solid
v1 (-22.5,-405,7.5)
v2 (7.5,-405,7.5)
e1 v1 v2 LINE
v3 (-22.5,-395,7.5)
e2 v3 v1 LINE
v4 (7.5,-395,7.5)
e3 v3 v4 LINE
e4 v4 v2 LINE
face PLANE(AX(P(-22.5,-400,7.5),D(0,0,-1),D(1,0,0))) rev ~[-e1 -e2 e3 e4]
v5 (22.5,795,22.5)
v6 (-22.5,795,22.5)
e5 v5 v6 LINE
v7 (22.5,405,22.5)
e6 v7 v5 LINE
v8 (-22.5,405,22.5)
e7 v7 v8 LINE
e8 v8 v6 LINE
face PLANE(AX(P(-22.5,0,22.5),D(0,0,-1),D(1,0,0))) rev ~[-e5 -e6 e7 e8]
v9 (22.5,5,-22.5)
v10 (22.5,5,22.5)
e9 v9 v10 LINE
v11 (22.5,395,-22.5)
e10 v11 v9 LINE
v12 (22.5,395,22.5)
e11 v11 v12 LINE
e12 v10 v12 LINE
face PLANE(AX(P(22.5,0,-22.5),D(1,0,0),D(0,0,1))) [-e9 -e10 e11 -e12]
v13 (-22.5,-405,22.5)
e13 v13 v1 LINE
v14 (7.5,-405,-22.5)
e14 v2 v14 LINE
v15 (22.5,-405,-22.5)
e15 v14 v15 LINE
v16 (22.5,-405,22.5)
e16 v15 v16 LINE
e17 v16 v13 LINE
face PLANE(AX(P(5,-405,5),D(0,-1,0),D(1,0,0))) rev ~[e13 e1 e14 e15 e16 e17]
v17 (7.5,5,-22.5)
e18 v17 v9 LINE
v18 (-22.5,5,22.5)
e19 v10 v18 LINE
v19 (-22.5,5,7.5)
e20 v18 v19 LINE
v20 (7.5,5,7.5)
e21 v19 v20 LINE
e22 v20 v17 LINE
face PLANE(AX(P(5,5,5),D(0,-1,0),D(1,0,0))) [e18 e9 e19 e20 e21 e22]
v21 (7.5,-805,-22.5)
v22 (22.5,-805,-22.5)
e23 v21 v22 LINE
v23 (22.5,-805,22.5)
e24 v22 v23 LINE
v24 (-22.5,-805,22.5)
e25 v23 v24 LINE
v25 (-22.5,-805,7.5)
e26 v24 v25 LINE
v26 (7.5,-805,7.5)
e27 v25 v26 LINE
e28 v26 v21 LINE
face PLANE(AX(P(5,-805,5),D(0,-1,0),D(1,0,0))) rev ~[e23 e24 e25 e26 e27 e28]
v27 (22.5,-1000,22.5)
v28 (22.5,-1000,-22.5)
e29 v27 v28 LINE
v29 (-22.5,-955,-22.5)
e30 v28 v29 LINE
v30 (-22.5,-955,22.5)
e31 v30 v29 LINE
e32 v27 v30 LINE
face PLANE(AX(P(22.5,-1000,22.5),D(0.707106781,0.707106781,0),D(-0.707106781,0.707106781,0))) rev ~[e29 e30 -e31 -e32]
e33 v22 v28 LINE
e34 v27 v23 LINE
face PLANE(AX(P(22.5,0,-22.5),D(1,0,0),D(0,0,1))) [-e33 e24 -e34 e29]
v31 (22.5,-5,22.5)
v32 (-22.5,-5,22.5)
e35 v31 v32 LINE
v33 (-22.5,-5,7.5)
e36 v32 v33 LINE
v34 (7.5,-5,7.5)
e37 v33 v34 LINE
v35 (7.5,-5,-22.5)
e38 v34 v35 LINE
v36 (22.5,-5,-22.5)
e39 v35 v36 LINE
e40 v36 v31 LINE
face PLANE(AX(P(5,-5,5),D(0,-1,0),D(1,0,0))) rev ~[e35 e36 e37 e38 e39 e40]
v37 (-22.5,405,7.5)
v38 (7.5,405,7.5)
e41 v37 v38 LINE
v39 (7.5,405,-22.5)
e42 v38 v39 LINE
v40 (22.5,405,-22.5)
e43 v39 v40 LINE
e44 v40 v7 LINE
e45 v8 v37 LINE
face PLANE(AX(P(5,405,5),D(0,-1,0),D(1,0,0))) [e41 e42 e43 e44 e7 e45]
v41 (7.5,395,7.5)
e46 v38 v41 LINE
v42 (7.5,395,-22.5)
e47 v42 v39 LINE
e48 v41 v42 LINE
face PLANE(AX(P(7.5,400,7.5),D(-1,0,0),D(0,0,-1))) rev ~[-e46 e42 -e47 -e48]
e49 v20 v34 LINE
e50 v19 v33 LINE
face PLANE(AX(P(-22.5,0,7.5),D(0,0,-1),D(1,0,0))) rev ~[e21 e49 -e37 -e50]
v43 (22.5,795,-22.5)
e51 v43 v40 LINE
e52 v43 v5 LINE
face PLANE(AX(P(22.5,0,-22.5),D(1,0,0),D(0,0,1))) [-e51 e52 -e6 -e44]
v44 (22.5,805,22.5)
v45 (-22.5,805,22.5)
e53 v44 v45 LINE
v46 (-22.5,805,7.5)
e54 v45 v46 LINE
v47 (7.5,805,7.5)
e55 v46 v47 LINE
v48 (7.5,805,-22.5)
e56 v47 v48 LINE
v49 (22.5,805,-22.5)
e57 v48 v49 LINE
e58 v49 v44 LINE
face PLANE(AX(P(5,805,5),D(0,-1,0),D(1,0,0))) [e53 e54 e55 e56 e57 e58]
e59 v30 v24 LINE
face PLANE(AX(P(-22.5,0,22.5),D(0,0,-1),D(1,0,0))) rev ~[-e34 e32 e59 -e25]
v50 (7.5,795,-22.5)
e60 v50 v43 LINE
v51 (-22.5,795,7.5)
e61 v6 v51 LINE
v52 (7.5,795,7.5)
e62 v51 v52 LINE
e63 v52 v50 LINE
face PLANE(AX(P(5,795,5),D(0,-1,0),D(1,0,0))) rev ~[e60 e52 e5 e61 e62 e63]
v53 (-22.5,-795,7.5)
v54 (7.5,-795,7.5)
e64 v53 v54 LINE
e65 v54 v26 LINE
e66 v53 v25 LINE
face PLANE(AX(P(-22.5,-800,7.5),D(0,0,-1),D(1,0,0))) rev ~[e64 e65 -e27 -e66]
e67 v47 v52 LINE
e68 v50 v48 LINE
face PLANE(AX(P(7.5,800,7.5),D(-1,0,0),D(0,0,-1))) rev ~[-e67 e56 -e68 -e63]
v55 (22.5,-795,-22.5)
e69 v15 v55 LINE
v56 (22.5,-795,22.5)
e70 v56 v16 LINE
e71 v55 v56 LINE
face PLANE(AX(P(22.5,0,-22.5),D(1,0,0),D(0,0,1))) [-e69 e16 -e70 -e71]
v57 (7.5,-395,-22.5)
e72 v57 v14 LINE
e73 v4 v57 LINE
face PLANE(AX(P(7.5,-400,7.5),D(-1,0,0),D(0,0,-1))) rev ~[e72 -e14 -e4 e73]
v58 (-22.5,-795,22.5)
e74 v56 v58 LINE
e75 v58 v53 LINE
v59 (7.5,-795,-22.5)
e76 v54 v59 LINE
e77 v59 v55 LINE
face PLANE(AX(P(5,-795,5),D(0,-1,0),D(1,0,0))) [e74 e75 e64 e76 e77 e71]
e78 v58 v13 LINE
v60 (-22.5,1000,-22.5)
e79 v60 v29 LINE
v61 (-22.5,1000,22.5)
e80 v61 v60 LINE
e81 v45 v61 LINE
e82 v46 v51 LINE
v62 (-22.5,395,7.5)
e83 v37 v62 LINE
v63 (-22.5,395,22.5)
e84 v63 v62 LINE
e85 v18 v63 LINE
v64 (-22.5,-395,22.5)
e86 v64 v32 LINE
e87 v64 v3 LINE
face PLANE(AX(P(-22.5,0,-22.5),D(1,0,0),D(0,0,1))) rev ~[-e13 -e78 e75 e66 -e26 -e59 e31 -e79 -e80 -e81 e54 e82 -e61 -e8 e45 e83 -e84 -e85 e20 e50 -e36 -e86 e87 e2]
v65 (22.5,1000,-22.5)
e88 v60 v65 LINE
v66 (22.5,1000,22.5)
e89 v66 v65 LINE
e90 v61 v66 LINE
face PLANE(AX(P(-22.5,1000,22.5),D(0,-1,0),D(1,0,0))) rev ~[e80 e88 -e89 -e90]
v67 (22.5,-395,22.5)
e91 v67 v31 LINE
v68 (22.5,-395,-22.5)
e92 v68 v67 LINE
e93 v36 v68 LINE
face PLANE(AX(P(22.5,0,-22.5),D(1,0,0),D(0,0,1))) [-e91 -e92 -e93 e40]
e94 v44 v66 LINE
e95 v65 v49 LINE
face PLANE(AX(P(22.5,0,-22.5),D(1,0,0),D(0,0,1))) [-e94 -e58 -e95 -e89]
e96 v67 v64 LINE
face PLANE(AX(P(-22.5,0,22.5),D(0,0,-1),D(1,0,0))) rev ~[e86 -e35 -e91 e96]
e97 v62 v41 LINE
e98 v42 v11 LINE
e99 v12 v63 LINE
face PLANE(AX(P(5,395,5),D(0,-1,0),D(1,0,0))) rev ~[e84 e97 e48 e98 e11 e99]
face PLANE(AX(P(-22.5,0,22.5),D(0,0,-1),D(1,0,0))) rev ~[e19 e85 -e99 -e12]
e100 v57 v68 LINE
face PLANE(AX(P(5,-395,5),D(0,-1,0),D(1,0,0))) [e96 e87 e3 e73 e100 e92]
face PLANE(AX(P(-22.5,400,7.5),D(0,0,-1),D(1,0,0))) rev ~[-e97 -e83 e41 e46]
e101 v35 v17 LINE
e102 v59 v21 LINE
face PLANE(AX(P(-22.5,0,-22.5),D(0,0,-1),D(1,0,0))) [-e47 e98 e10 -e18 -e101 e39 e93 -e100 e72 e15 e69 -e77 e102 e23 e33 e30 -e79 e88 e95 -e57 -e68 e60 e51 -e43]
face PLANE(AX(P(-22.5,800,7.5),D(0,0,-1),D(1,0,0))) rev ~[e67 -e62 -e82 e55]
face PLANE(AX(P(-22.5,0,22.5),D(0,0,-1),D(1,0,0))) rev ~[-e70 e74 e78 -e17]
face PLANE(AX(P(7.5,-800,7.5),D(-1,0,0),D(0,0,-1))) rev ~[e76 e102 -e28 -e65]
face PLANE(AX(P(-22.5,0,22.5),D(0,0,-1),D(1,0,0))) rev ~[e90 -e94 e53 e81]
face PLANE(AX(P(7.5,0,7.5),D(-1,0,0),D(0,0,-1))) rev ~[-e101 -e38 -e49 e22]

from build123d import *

# Parameters (mm, degrees)
F0_W            = 45
F0_H            = 45
F1_DEPTH        = 1500
F2_W            = 45
F2_H            = 500
F3_DEPTH        = 45
F5_DEPTH        = 5
F5_COPIES_COUNT = 3
F5_COPIES_PITCH = 400
F8_DEPTH        = 5
F11_DEPTH       = 5


# Not quite as in the source:
# - a pattern or mirror of a feature is missing from the dataset's text; its kind, count and spacing are read off the source's solid


with BuildPart() as f1:
    # F0 (on Front) → F1 (new body, symmetric)
    with BuildSketch(Plane.XZ):
        Rectangle(F0_W, F0_H)
    extrude(amount=F1_DEPTH, both=True)

    # F2 (on face) → F3 (cut, through all)
    with BuildSketch(Plane.XY.offset(22.5)):
        Polygon((22.5, -1000), (-22.5, -955), (-22.5, -1500), (22.5, -1500), align=None)
        with Locations((0, 1250)):
            Rectangle(F2_W, F2_H)
    extrude(amount=-F3_DEPTH, mode=Mode.SUBTRACT)

    # F4 (on Front) → F5 (cut, symmetric)
    with BuildSketch(Plane.XZ):
        Polygon((22.5, 22.5), (-22.5, 22.5), (-22.5, 7.5), (7.5, 7.5), (7.5, -22.5), (22.5, -22.5), align=None)
    f5 = extrude(amount=F5_DEPTH, both=True, mode=Mode.SUBTRACT)

    # F5_copies: F5 ×3
    with Locations(*[(0, i * F5_COPIES_PITCH, 0) for i in range(1, F5_COPIES_COUNT)]):
        add(f5, mode=Mode.SUBTRACT)

    # F7 (on offset) → F8 (cut, symmetric)
    with BuildSketch(Plane.XZ.offset(400)):
        Polygon((-22.5, 22.5), (-22.5, 7.5), (7.5, 7.5), (7.5, -22.5), (22.5, -22.5), (22.5, 22.5), align=None)
    extrude(amount=F8_DEPTH, both=True, mode=Mode.SUBTRACT)

    # F10 (on offset) → F11 (cut, symmetric)
    with BuildSketch(Plane.XZ.offset(800)):
        Polygon((-22.5, 22.5), (-22.5, 7.5), (7.5, 7.5), (7.5, -22.5), (22.5, -22.5), (22.5, 22.5), align=None)
    extrude(amount=F11_DEPTH, both=True, mode=Mode.SUBTRACT)


solid = f1.part
